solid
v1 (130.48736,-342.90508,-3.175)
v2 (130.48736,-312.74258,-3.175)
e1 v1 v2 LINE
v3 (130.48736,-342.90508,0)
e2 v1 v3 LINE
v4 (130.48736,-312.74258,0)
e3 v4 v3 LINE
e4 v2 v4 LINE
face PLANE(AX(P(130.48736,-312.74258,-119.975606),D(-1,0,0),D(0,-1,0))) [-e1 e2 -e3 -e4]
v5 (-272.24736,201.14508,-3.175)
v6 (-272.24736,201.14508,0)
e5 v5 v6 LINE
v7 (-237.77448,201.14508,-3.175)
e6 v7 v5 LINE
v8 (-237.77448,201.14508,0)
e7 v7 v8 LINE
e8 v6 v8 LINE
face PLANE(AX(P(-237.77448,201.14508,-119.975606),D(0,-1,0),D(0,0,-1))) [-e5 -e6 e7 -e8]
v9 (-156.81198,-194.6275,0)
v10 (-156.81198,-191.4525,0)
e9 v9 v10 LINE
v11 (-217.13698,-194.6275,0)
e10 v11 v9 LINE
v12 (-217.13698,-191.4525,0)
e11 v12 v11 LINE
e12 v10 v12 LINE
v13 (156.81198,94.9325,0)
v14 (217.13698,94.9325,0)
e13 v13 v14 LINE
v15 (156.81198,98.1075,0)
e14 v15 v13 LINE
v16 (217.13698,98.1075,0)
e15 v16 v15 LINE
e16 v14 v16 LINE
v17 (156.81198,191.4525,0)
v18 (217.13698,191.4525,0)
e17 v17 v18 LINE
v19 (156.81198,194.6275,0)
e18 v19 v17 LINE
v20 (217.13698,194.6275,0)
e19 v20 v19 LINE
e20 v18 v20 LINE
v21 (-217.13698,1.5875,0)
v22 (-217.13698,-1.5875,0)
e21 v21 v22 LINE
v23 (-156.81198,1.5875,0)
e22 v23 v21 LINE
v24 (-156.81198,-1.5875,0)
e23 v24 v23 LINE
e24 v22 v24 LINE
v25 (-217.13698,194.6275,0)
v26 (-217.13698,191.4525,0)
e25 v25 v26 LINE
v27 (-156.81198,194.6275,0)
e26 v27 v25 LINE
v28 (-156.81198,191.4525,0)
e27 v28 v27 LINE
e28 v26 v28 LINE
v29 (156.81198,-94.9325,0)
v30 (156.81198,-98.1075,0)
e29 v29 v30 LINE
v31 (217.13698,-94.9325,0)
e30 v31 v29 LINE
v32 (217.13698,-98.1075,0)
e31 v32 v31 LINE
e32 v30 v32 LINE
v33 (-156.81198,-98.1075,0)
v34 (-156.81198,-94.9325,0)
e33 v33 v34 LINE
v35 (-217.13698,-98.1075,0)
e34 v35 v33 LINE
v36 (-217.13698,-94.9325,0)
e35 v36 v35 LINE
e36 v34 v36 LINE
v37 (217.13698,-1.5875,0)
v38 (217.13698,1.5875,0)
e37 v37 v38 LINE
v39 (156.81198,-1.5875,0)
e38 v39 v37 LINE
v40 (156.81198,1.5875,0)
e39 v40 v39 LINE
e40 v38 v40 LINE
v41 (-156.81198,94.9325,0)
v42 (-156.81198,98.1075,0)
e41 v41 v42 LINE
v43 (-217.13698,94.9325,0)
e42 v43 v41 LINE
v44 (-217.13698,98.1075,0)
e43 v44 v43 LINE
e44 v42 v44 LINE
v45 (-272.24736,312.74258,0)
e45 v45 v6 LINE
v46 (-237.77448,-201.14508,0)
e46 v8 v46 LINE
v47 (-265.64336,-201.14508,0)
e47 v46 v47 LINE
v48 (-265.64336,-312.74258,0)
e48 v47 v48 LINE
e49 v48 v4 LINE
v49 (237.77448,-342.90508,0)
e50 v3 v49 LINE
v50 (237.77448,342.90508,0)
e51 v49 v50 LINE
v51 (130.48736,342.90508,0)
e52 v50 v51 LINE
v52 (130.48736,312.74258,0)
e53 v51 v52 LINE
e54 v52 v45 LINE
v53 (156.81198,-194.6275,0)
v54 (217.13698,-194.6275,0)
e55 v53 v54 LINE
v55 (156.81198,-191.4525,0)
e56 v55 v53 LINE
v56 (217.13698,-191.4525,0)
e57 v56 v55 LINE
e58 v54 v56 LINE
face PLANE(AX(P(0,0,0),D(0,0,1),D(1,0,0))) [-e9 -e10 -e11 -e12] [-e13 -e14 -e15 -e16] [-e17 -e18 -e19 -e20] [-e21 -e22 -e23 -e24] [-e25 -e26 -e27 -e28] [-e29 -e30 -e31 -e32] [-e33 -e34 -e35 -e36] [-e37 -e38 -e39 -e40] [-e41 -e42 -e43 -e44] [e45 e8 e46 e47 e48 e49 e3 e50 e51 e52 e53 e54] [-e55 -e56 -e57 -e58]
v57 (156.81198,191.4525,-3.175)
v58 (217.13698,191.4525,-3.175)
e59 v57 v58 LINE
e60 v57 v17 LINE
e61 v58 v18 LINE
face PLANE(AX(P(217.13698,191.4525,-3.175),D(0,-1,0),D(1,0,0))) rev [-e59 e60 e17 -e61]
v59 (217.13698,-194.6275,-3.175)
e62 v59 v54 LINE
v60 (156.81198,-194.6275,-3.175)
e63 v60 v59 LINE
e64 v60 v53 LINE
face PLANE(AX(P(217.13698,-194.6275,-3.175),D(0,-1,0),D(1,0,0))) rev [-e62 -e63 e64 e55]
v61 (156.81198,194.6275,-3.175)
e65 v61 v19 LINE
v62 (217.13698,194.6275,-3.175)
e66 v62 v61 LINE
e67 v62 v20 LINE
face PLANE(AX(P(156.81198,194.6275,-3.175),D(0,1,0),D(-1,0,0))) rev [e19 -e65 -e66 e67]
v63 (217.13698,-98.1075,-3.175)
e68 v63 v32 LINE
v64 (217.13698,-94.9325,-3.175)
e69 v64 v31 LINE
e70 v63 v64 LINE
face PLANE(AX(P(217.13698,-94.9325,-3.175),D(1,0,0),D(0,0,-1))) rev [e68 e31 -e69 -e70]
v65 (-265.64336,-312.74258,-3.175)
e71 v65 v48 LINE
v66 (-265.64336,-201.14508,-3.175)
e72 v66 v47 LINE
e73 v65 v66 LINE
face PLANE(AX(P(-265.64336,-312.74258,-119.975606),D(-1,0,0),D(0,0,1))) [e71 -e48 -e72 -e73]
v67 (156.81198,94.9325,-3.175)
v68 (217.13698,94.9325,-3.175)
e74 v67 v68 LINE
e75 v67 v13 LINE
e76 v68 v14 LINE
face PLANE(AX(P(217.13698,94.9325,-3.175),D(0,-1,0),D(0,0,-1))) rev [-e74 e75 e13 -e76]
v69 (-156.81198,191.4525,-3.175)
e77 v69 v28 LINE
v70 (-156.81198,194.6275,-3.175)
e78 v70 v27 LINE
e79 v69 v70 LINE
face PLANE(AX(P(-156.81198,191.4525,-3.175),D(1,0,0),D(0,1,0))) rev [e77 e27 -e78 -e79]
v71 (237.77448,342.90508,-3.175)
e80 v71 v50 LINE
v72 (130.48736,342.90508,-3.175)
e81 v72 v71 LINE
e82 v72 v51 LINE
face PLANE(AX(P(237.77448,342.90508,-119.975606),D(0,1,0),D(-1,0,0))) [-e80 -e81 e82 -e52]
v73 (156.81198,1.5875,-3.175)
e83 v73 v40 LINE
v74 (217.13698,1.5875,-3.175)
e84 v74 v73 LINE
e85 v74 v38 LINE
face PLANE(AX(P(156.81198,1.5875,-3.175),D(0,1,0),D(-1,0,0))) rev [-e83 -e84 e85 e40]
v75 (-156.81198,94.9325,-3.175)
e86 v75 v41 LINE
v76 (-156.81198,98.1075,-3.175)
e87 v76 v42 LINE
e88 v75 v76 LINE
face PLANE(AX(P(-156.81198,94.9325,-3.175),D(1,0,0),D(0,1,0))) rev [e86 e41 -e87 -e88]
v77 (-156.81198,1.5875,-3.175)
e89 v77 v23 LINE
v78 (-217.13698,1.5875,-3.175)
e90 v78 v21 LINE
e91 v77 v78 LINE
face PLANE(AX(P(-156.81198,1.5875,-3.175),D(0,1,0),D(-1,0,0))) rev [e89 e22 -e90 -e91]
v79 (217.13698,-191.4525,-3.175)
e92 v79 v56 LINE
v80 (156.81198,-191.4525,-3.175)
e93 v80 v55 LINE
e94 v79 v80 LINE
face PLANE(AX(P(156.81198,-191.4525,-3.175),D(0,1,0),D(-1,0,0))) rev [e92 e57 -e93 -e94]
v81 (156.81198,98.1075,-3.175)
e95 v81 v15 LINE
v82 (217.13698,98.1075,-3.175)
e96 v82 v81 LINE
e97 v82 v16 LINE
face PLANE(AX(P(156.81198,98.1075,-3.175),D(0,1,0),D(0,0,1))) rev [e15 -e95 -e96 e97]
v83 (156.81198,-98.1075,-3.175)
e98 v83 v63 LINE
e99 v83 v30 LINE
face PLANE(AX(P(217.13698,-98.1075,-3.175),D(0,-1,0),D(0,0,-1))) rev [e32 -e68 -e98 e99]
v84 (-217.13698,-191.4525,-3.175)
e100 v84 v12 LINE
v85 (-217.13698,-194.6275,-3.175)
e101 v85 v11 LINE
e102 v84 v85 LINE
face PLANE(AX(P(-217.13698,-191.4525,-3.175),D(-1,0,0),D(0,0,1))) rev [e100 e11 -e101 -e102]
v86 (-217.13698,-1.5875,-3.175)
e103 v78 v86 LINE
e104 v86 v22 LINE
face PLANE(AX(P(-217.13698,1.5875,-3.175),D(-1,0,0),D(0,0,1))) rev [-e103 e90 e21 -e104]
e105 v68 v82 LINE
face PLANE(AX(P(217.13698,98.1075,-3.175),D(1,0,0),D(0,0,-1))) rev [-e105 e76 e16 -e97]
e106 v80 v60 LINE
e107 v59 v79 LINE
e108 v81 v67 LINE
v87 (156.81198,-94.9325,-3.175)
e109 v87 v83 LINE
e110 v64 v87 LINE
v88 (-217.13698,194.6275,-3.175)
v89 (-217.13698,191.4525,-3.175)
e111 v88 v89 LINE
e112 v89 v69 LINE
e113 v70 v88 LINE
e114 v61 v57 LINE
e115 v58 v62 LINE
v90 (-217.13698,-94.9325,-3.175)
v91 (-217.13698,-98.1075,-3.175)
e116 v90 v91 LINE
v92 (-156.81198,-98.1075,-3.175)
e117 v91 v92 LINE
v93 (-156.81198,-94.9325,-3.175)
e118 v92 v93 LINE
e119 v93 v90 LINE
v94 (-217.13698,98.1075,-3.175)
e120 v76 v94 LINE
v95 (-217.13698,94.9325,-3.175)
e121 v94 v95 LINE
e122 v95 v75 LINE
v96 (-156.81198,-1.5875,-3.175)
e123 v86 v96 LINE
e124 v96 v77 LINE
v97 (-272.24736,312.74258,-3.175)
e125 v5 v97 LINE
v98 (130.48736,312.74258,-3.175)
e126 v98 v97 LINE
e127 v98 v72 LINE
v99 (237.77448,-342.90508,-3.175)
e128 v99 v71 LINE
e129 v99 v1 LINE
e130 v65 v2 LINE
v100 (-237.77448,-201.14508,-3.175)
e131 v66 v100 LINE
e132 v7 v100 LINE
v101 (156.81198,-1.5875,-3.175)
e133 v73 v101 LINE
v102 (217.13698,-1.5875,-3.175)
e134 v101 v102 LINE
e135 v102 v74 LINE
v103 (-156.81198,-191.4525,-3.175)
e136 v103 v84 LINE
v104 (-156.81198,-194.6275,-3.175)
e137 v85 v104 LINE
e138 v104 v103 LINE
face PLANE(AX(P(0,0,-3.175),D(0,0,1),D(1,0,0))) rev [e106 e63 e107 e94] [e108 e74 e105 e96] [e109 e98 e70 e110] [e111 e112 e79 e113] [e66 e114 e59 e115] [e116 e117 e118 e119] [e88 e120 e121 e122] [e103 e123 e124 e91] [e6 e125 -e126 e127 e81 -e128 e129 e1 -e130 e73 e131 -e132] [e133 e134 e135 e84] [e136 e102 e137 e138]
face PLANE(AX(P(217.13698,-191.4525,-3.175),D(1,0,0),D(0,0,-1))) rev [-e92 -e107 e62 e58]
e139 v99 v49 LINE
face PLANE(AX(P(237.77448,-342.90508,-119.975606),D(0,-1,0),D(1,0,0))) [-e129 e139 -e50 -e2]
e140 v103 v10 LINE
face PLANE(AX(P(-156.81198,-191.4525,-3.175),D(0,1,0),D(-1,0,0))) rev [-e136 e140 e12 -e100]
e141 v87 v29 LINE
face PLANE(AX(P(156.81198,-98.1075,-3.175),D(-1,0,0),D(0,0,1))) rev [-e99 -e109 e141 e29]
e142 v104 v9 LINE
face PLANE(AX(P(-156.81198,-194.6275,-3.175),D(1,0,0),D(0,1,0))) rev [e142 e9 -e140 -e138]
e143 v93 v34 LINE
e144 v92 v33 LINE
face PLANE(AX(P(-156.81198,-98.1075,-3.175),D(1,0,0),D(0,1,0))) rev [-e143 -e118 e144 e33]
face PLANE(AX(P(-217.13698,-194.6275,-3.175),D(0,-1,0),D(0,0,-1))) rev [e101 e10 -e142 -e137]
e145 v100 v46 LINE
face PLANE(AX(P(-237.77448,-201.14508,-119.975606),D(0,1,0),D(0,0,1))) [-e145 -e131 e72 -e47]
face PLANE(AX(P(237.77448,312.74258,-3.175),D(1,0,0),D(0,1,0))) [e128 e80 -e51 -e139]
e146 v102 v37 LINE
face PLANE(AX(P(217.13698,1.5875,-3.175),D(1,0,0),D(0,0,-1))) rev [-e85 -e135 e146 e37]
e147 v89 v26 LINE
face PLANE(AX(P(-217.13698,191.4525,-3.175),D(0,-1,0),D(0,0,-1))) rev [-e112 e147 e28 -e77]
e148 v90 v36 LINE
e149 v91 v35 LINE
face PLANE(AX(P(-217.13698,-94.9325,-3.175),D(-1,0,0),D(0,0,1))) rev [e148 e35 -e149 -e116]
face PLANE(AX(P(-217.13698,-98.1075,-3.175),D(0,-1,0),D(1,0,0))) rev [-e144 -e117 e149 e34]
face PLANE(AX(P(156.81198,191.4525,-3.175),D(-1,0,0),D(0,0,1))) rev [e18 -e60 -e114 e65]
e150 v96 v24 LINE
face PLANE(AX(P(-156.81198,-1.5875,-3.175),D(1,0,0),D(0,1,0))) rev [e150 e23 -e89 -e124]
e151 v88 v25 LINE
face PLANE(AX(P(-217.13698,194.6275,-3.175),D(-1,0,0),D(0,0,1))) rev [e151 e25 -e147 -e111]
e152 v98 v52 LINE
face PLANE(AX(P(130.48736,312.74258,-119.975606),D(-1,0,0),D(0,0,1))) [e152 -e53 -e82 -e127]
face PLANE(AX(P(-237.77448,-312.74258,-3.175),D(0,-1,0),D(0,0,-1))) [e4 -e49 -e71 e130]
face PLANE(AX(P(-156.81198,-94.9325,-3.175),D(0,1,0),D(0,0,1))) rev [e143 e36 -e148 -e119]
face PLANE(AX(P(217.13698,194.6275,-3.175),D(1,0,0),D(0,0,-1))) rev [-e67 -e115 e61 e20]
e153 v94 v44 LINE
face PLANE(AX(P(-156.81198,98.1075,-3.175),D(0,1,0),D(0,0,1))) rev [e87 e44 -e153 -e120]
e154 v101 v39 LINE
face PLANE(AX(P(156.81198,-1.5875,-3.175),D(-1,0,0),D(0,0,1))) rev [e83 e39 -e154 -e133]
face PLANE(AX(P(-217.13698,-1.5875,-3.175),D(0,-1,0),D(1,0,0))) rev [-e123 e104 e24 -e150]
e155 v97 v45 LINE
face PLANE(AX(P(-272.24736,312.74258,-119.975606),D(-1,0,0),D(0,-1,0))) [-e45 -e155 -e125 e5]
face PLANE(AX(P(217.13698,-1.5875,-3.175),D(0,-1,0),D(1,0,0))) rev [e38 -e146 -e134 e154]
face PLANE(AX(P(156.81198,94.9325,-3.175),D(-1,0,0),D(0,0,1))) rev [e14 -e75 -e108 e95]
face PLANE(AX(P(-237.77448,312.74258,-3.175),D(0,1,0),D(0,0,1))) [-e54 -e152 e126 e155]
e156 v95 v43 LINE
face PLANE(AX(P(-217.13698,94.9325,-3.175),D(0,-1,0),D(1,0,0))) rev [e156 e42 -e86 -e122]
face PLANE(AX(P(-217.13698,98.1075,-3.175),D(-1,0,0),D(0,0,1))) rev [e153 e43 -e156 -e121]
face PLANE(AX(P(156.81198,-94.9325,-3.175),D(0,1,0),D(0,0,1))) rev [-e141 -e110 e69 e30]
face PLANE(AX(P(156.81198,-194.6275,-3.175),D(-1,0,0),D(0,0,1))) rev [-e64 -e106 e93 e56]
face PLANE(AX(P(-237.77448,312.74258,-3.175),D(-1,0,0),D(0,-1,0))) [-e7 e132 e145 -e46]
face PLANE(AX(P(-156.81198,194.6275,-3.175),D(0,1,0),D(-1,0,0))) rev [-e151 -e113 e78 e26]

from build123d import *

# Parameters (mm, degrees)
SKETCH1_W               = 475.54896
SKETCH1_H               = 625.48516
BASE_FLANGE1_DEPTH      = 3.175
CUT_EXTRUDE1_DEPTH      = 393.880013884
CUT_EXTRUDE1_DEPTH_BACK = 393.880013884
SKETCH2_W               = 60.325
SKETCH2_H               = 3.175
SKETCH3_W               = 107.287119944
SKETCH3_H               = 30.1625
SKETCH3_W_2             = 34.47288
SKETCH3_H_2             = 111.597499944
SKETCH3_W_3             = 27.86888
BOSS_EXTRUDE1_DEPTH     = 3.175


# Sheet-metal steps are written as plain solids
with BuildPart() as part:
    # Sketch1 → Base-Flange1 (new body)
    with BuildSketch(Plane.XY):
        Rectangle(SKETCH1_W, SKETCH1_H)
    extrude(amount=-BASE_FLANGE1_DEPTH)

    # Sketch2 → Cut-Extrude1 (cut, two sides: drawn at the far end of the back side and taken through both)
    with BuildSketch(Plane.XY.offset(-CUT_EXTRUDE1_DEPTH_BACK)):
        with Locations((-186.97448, 96.52)):
            Rectangle(SKETCH2_W, SKETCH2_H)
        with Locations((-186.97448, 0)):
            Rectangle(SKETCH2_W, SKETCH2_H)
        with Locations((186.97448, 0)):
            Rectangle(SKETCH2_W, SKETCH2_H)
        with Locations((186.97448, 96.52)):
            Rectangle(SKETCH2_W, SKETCH2_H)
        with Locations((-186.97448, 193.04)):
            Rectangle(SKETCH2_W, SKETCH2_H)
        with Locations((186.97448, 193.04)):
            Rectangle(SKETCH2_W, SKETCH2_H)
        with Locations((-186.97448, -96.52)):
            Rectangle(SKETCH2_W, SKETCH2_H)
        with Locations((186.97448, -96.52)):
            Rectangle(SKETCH2_W, SKETCH2_H)
        with Locations((-186.97448, -193.04)):
            Rectangle(SKETCH2_W, SKETCH2_H)
        with Locations((186.97448, -193.04)):
            Rectangle(SKETCH2_W, SKETCH2_H)
    extrude(amount=CUT_EXTRUDE1_DEPTH + CUT_EXTRUDE1_DEPTH_BACK, mode=Mode.SUBTRACT)

    # Sketch3 → Boss-Extrude1 (add)
    with BuildSketch(Plane.XY):
        with Locations((184.130920028, 327.82383)):
            Rectangle(SKETCH3_W, SKETCH3_H)
        with Locations((-255.01092, 256.943830028)):
            Rectangle(SKETCH3_W_2, SKETCH3_H_2)
        with Locations((-251.70892, -256.943830028)):
            Rectangle(SKETCH3_W_3, SKETCH3_H_2)
        with Locations((184.130920028, -327.82383)):
            Rectangle(SKETCH3_W, SKETCH3_H)
    extrude(amount=-BOSS_EXTRUDE1_DEPTH)


solid = part.part
